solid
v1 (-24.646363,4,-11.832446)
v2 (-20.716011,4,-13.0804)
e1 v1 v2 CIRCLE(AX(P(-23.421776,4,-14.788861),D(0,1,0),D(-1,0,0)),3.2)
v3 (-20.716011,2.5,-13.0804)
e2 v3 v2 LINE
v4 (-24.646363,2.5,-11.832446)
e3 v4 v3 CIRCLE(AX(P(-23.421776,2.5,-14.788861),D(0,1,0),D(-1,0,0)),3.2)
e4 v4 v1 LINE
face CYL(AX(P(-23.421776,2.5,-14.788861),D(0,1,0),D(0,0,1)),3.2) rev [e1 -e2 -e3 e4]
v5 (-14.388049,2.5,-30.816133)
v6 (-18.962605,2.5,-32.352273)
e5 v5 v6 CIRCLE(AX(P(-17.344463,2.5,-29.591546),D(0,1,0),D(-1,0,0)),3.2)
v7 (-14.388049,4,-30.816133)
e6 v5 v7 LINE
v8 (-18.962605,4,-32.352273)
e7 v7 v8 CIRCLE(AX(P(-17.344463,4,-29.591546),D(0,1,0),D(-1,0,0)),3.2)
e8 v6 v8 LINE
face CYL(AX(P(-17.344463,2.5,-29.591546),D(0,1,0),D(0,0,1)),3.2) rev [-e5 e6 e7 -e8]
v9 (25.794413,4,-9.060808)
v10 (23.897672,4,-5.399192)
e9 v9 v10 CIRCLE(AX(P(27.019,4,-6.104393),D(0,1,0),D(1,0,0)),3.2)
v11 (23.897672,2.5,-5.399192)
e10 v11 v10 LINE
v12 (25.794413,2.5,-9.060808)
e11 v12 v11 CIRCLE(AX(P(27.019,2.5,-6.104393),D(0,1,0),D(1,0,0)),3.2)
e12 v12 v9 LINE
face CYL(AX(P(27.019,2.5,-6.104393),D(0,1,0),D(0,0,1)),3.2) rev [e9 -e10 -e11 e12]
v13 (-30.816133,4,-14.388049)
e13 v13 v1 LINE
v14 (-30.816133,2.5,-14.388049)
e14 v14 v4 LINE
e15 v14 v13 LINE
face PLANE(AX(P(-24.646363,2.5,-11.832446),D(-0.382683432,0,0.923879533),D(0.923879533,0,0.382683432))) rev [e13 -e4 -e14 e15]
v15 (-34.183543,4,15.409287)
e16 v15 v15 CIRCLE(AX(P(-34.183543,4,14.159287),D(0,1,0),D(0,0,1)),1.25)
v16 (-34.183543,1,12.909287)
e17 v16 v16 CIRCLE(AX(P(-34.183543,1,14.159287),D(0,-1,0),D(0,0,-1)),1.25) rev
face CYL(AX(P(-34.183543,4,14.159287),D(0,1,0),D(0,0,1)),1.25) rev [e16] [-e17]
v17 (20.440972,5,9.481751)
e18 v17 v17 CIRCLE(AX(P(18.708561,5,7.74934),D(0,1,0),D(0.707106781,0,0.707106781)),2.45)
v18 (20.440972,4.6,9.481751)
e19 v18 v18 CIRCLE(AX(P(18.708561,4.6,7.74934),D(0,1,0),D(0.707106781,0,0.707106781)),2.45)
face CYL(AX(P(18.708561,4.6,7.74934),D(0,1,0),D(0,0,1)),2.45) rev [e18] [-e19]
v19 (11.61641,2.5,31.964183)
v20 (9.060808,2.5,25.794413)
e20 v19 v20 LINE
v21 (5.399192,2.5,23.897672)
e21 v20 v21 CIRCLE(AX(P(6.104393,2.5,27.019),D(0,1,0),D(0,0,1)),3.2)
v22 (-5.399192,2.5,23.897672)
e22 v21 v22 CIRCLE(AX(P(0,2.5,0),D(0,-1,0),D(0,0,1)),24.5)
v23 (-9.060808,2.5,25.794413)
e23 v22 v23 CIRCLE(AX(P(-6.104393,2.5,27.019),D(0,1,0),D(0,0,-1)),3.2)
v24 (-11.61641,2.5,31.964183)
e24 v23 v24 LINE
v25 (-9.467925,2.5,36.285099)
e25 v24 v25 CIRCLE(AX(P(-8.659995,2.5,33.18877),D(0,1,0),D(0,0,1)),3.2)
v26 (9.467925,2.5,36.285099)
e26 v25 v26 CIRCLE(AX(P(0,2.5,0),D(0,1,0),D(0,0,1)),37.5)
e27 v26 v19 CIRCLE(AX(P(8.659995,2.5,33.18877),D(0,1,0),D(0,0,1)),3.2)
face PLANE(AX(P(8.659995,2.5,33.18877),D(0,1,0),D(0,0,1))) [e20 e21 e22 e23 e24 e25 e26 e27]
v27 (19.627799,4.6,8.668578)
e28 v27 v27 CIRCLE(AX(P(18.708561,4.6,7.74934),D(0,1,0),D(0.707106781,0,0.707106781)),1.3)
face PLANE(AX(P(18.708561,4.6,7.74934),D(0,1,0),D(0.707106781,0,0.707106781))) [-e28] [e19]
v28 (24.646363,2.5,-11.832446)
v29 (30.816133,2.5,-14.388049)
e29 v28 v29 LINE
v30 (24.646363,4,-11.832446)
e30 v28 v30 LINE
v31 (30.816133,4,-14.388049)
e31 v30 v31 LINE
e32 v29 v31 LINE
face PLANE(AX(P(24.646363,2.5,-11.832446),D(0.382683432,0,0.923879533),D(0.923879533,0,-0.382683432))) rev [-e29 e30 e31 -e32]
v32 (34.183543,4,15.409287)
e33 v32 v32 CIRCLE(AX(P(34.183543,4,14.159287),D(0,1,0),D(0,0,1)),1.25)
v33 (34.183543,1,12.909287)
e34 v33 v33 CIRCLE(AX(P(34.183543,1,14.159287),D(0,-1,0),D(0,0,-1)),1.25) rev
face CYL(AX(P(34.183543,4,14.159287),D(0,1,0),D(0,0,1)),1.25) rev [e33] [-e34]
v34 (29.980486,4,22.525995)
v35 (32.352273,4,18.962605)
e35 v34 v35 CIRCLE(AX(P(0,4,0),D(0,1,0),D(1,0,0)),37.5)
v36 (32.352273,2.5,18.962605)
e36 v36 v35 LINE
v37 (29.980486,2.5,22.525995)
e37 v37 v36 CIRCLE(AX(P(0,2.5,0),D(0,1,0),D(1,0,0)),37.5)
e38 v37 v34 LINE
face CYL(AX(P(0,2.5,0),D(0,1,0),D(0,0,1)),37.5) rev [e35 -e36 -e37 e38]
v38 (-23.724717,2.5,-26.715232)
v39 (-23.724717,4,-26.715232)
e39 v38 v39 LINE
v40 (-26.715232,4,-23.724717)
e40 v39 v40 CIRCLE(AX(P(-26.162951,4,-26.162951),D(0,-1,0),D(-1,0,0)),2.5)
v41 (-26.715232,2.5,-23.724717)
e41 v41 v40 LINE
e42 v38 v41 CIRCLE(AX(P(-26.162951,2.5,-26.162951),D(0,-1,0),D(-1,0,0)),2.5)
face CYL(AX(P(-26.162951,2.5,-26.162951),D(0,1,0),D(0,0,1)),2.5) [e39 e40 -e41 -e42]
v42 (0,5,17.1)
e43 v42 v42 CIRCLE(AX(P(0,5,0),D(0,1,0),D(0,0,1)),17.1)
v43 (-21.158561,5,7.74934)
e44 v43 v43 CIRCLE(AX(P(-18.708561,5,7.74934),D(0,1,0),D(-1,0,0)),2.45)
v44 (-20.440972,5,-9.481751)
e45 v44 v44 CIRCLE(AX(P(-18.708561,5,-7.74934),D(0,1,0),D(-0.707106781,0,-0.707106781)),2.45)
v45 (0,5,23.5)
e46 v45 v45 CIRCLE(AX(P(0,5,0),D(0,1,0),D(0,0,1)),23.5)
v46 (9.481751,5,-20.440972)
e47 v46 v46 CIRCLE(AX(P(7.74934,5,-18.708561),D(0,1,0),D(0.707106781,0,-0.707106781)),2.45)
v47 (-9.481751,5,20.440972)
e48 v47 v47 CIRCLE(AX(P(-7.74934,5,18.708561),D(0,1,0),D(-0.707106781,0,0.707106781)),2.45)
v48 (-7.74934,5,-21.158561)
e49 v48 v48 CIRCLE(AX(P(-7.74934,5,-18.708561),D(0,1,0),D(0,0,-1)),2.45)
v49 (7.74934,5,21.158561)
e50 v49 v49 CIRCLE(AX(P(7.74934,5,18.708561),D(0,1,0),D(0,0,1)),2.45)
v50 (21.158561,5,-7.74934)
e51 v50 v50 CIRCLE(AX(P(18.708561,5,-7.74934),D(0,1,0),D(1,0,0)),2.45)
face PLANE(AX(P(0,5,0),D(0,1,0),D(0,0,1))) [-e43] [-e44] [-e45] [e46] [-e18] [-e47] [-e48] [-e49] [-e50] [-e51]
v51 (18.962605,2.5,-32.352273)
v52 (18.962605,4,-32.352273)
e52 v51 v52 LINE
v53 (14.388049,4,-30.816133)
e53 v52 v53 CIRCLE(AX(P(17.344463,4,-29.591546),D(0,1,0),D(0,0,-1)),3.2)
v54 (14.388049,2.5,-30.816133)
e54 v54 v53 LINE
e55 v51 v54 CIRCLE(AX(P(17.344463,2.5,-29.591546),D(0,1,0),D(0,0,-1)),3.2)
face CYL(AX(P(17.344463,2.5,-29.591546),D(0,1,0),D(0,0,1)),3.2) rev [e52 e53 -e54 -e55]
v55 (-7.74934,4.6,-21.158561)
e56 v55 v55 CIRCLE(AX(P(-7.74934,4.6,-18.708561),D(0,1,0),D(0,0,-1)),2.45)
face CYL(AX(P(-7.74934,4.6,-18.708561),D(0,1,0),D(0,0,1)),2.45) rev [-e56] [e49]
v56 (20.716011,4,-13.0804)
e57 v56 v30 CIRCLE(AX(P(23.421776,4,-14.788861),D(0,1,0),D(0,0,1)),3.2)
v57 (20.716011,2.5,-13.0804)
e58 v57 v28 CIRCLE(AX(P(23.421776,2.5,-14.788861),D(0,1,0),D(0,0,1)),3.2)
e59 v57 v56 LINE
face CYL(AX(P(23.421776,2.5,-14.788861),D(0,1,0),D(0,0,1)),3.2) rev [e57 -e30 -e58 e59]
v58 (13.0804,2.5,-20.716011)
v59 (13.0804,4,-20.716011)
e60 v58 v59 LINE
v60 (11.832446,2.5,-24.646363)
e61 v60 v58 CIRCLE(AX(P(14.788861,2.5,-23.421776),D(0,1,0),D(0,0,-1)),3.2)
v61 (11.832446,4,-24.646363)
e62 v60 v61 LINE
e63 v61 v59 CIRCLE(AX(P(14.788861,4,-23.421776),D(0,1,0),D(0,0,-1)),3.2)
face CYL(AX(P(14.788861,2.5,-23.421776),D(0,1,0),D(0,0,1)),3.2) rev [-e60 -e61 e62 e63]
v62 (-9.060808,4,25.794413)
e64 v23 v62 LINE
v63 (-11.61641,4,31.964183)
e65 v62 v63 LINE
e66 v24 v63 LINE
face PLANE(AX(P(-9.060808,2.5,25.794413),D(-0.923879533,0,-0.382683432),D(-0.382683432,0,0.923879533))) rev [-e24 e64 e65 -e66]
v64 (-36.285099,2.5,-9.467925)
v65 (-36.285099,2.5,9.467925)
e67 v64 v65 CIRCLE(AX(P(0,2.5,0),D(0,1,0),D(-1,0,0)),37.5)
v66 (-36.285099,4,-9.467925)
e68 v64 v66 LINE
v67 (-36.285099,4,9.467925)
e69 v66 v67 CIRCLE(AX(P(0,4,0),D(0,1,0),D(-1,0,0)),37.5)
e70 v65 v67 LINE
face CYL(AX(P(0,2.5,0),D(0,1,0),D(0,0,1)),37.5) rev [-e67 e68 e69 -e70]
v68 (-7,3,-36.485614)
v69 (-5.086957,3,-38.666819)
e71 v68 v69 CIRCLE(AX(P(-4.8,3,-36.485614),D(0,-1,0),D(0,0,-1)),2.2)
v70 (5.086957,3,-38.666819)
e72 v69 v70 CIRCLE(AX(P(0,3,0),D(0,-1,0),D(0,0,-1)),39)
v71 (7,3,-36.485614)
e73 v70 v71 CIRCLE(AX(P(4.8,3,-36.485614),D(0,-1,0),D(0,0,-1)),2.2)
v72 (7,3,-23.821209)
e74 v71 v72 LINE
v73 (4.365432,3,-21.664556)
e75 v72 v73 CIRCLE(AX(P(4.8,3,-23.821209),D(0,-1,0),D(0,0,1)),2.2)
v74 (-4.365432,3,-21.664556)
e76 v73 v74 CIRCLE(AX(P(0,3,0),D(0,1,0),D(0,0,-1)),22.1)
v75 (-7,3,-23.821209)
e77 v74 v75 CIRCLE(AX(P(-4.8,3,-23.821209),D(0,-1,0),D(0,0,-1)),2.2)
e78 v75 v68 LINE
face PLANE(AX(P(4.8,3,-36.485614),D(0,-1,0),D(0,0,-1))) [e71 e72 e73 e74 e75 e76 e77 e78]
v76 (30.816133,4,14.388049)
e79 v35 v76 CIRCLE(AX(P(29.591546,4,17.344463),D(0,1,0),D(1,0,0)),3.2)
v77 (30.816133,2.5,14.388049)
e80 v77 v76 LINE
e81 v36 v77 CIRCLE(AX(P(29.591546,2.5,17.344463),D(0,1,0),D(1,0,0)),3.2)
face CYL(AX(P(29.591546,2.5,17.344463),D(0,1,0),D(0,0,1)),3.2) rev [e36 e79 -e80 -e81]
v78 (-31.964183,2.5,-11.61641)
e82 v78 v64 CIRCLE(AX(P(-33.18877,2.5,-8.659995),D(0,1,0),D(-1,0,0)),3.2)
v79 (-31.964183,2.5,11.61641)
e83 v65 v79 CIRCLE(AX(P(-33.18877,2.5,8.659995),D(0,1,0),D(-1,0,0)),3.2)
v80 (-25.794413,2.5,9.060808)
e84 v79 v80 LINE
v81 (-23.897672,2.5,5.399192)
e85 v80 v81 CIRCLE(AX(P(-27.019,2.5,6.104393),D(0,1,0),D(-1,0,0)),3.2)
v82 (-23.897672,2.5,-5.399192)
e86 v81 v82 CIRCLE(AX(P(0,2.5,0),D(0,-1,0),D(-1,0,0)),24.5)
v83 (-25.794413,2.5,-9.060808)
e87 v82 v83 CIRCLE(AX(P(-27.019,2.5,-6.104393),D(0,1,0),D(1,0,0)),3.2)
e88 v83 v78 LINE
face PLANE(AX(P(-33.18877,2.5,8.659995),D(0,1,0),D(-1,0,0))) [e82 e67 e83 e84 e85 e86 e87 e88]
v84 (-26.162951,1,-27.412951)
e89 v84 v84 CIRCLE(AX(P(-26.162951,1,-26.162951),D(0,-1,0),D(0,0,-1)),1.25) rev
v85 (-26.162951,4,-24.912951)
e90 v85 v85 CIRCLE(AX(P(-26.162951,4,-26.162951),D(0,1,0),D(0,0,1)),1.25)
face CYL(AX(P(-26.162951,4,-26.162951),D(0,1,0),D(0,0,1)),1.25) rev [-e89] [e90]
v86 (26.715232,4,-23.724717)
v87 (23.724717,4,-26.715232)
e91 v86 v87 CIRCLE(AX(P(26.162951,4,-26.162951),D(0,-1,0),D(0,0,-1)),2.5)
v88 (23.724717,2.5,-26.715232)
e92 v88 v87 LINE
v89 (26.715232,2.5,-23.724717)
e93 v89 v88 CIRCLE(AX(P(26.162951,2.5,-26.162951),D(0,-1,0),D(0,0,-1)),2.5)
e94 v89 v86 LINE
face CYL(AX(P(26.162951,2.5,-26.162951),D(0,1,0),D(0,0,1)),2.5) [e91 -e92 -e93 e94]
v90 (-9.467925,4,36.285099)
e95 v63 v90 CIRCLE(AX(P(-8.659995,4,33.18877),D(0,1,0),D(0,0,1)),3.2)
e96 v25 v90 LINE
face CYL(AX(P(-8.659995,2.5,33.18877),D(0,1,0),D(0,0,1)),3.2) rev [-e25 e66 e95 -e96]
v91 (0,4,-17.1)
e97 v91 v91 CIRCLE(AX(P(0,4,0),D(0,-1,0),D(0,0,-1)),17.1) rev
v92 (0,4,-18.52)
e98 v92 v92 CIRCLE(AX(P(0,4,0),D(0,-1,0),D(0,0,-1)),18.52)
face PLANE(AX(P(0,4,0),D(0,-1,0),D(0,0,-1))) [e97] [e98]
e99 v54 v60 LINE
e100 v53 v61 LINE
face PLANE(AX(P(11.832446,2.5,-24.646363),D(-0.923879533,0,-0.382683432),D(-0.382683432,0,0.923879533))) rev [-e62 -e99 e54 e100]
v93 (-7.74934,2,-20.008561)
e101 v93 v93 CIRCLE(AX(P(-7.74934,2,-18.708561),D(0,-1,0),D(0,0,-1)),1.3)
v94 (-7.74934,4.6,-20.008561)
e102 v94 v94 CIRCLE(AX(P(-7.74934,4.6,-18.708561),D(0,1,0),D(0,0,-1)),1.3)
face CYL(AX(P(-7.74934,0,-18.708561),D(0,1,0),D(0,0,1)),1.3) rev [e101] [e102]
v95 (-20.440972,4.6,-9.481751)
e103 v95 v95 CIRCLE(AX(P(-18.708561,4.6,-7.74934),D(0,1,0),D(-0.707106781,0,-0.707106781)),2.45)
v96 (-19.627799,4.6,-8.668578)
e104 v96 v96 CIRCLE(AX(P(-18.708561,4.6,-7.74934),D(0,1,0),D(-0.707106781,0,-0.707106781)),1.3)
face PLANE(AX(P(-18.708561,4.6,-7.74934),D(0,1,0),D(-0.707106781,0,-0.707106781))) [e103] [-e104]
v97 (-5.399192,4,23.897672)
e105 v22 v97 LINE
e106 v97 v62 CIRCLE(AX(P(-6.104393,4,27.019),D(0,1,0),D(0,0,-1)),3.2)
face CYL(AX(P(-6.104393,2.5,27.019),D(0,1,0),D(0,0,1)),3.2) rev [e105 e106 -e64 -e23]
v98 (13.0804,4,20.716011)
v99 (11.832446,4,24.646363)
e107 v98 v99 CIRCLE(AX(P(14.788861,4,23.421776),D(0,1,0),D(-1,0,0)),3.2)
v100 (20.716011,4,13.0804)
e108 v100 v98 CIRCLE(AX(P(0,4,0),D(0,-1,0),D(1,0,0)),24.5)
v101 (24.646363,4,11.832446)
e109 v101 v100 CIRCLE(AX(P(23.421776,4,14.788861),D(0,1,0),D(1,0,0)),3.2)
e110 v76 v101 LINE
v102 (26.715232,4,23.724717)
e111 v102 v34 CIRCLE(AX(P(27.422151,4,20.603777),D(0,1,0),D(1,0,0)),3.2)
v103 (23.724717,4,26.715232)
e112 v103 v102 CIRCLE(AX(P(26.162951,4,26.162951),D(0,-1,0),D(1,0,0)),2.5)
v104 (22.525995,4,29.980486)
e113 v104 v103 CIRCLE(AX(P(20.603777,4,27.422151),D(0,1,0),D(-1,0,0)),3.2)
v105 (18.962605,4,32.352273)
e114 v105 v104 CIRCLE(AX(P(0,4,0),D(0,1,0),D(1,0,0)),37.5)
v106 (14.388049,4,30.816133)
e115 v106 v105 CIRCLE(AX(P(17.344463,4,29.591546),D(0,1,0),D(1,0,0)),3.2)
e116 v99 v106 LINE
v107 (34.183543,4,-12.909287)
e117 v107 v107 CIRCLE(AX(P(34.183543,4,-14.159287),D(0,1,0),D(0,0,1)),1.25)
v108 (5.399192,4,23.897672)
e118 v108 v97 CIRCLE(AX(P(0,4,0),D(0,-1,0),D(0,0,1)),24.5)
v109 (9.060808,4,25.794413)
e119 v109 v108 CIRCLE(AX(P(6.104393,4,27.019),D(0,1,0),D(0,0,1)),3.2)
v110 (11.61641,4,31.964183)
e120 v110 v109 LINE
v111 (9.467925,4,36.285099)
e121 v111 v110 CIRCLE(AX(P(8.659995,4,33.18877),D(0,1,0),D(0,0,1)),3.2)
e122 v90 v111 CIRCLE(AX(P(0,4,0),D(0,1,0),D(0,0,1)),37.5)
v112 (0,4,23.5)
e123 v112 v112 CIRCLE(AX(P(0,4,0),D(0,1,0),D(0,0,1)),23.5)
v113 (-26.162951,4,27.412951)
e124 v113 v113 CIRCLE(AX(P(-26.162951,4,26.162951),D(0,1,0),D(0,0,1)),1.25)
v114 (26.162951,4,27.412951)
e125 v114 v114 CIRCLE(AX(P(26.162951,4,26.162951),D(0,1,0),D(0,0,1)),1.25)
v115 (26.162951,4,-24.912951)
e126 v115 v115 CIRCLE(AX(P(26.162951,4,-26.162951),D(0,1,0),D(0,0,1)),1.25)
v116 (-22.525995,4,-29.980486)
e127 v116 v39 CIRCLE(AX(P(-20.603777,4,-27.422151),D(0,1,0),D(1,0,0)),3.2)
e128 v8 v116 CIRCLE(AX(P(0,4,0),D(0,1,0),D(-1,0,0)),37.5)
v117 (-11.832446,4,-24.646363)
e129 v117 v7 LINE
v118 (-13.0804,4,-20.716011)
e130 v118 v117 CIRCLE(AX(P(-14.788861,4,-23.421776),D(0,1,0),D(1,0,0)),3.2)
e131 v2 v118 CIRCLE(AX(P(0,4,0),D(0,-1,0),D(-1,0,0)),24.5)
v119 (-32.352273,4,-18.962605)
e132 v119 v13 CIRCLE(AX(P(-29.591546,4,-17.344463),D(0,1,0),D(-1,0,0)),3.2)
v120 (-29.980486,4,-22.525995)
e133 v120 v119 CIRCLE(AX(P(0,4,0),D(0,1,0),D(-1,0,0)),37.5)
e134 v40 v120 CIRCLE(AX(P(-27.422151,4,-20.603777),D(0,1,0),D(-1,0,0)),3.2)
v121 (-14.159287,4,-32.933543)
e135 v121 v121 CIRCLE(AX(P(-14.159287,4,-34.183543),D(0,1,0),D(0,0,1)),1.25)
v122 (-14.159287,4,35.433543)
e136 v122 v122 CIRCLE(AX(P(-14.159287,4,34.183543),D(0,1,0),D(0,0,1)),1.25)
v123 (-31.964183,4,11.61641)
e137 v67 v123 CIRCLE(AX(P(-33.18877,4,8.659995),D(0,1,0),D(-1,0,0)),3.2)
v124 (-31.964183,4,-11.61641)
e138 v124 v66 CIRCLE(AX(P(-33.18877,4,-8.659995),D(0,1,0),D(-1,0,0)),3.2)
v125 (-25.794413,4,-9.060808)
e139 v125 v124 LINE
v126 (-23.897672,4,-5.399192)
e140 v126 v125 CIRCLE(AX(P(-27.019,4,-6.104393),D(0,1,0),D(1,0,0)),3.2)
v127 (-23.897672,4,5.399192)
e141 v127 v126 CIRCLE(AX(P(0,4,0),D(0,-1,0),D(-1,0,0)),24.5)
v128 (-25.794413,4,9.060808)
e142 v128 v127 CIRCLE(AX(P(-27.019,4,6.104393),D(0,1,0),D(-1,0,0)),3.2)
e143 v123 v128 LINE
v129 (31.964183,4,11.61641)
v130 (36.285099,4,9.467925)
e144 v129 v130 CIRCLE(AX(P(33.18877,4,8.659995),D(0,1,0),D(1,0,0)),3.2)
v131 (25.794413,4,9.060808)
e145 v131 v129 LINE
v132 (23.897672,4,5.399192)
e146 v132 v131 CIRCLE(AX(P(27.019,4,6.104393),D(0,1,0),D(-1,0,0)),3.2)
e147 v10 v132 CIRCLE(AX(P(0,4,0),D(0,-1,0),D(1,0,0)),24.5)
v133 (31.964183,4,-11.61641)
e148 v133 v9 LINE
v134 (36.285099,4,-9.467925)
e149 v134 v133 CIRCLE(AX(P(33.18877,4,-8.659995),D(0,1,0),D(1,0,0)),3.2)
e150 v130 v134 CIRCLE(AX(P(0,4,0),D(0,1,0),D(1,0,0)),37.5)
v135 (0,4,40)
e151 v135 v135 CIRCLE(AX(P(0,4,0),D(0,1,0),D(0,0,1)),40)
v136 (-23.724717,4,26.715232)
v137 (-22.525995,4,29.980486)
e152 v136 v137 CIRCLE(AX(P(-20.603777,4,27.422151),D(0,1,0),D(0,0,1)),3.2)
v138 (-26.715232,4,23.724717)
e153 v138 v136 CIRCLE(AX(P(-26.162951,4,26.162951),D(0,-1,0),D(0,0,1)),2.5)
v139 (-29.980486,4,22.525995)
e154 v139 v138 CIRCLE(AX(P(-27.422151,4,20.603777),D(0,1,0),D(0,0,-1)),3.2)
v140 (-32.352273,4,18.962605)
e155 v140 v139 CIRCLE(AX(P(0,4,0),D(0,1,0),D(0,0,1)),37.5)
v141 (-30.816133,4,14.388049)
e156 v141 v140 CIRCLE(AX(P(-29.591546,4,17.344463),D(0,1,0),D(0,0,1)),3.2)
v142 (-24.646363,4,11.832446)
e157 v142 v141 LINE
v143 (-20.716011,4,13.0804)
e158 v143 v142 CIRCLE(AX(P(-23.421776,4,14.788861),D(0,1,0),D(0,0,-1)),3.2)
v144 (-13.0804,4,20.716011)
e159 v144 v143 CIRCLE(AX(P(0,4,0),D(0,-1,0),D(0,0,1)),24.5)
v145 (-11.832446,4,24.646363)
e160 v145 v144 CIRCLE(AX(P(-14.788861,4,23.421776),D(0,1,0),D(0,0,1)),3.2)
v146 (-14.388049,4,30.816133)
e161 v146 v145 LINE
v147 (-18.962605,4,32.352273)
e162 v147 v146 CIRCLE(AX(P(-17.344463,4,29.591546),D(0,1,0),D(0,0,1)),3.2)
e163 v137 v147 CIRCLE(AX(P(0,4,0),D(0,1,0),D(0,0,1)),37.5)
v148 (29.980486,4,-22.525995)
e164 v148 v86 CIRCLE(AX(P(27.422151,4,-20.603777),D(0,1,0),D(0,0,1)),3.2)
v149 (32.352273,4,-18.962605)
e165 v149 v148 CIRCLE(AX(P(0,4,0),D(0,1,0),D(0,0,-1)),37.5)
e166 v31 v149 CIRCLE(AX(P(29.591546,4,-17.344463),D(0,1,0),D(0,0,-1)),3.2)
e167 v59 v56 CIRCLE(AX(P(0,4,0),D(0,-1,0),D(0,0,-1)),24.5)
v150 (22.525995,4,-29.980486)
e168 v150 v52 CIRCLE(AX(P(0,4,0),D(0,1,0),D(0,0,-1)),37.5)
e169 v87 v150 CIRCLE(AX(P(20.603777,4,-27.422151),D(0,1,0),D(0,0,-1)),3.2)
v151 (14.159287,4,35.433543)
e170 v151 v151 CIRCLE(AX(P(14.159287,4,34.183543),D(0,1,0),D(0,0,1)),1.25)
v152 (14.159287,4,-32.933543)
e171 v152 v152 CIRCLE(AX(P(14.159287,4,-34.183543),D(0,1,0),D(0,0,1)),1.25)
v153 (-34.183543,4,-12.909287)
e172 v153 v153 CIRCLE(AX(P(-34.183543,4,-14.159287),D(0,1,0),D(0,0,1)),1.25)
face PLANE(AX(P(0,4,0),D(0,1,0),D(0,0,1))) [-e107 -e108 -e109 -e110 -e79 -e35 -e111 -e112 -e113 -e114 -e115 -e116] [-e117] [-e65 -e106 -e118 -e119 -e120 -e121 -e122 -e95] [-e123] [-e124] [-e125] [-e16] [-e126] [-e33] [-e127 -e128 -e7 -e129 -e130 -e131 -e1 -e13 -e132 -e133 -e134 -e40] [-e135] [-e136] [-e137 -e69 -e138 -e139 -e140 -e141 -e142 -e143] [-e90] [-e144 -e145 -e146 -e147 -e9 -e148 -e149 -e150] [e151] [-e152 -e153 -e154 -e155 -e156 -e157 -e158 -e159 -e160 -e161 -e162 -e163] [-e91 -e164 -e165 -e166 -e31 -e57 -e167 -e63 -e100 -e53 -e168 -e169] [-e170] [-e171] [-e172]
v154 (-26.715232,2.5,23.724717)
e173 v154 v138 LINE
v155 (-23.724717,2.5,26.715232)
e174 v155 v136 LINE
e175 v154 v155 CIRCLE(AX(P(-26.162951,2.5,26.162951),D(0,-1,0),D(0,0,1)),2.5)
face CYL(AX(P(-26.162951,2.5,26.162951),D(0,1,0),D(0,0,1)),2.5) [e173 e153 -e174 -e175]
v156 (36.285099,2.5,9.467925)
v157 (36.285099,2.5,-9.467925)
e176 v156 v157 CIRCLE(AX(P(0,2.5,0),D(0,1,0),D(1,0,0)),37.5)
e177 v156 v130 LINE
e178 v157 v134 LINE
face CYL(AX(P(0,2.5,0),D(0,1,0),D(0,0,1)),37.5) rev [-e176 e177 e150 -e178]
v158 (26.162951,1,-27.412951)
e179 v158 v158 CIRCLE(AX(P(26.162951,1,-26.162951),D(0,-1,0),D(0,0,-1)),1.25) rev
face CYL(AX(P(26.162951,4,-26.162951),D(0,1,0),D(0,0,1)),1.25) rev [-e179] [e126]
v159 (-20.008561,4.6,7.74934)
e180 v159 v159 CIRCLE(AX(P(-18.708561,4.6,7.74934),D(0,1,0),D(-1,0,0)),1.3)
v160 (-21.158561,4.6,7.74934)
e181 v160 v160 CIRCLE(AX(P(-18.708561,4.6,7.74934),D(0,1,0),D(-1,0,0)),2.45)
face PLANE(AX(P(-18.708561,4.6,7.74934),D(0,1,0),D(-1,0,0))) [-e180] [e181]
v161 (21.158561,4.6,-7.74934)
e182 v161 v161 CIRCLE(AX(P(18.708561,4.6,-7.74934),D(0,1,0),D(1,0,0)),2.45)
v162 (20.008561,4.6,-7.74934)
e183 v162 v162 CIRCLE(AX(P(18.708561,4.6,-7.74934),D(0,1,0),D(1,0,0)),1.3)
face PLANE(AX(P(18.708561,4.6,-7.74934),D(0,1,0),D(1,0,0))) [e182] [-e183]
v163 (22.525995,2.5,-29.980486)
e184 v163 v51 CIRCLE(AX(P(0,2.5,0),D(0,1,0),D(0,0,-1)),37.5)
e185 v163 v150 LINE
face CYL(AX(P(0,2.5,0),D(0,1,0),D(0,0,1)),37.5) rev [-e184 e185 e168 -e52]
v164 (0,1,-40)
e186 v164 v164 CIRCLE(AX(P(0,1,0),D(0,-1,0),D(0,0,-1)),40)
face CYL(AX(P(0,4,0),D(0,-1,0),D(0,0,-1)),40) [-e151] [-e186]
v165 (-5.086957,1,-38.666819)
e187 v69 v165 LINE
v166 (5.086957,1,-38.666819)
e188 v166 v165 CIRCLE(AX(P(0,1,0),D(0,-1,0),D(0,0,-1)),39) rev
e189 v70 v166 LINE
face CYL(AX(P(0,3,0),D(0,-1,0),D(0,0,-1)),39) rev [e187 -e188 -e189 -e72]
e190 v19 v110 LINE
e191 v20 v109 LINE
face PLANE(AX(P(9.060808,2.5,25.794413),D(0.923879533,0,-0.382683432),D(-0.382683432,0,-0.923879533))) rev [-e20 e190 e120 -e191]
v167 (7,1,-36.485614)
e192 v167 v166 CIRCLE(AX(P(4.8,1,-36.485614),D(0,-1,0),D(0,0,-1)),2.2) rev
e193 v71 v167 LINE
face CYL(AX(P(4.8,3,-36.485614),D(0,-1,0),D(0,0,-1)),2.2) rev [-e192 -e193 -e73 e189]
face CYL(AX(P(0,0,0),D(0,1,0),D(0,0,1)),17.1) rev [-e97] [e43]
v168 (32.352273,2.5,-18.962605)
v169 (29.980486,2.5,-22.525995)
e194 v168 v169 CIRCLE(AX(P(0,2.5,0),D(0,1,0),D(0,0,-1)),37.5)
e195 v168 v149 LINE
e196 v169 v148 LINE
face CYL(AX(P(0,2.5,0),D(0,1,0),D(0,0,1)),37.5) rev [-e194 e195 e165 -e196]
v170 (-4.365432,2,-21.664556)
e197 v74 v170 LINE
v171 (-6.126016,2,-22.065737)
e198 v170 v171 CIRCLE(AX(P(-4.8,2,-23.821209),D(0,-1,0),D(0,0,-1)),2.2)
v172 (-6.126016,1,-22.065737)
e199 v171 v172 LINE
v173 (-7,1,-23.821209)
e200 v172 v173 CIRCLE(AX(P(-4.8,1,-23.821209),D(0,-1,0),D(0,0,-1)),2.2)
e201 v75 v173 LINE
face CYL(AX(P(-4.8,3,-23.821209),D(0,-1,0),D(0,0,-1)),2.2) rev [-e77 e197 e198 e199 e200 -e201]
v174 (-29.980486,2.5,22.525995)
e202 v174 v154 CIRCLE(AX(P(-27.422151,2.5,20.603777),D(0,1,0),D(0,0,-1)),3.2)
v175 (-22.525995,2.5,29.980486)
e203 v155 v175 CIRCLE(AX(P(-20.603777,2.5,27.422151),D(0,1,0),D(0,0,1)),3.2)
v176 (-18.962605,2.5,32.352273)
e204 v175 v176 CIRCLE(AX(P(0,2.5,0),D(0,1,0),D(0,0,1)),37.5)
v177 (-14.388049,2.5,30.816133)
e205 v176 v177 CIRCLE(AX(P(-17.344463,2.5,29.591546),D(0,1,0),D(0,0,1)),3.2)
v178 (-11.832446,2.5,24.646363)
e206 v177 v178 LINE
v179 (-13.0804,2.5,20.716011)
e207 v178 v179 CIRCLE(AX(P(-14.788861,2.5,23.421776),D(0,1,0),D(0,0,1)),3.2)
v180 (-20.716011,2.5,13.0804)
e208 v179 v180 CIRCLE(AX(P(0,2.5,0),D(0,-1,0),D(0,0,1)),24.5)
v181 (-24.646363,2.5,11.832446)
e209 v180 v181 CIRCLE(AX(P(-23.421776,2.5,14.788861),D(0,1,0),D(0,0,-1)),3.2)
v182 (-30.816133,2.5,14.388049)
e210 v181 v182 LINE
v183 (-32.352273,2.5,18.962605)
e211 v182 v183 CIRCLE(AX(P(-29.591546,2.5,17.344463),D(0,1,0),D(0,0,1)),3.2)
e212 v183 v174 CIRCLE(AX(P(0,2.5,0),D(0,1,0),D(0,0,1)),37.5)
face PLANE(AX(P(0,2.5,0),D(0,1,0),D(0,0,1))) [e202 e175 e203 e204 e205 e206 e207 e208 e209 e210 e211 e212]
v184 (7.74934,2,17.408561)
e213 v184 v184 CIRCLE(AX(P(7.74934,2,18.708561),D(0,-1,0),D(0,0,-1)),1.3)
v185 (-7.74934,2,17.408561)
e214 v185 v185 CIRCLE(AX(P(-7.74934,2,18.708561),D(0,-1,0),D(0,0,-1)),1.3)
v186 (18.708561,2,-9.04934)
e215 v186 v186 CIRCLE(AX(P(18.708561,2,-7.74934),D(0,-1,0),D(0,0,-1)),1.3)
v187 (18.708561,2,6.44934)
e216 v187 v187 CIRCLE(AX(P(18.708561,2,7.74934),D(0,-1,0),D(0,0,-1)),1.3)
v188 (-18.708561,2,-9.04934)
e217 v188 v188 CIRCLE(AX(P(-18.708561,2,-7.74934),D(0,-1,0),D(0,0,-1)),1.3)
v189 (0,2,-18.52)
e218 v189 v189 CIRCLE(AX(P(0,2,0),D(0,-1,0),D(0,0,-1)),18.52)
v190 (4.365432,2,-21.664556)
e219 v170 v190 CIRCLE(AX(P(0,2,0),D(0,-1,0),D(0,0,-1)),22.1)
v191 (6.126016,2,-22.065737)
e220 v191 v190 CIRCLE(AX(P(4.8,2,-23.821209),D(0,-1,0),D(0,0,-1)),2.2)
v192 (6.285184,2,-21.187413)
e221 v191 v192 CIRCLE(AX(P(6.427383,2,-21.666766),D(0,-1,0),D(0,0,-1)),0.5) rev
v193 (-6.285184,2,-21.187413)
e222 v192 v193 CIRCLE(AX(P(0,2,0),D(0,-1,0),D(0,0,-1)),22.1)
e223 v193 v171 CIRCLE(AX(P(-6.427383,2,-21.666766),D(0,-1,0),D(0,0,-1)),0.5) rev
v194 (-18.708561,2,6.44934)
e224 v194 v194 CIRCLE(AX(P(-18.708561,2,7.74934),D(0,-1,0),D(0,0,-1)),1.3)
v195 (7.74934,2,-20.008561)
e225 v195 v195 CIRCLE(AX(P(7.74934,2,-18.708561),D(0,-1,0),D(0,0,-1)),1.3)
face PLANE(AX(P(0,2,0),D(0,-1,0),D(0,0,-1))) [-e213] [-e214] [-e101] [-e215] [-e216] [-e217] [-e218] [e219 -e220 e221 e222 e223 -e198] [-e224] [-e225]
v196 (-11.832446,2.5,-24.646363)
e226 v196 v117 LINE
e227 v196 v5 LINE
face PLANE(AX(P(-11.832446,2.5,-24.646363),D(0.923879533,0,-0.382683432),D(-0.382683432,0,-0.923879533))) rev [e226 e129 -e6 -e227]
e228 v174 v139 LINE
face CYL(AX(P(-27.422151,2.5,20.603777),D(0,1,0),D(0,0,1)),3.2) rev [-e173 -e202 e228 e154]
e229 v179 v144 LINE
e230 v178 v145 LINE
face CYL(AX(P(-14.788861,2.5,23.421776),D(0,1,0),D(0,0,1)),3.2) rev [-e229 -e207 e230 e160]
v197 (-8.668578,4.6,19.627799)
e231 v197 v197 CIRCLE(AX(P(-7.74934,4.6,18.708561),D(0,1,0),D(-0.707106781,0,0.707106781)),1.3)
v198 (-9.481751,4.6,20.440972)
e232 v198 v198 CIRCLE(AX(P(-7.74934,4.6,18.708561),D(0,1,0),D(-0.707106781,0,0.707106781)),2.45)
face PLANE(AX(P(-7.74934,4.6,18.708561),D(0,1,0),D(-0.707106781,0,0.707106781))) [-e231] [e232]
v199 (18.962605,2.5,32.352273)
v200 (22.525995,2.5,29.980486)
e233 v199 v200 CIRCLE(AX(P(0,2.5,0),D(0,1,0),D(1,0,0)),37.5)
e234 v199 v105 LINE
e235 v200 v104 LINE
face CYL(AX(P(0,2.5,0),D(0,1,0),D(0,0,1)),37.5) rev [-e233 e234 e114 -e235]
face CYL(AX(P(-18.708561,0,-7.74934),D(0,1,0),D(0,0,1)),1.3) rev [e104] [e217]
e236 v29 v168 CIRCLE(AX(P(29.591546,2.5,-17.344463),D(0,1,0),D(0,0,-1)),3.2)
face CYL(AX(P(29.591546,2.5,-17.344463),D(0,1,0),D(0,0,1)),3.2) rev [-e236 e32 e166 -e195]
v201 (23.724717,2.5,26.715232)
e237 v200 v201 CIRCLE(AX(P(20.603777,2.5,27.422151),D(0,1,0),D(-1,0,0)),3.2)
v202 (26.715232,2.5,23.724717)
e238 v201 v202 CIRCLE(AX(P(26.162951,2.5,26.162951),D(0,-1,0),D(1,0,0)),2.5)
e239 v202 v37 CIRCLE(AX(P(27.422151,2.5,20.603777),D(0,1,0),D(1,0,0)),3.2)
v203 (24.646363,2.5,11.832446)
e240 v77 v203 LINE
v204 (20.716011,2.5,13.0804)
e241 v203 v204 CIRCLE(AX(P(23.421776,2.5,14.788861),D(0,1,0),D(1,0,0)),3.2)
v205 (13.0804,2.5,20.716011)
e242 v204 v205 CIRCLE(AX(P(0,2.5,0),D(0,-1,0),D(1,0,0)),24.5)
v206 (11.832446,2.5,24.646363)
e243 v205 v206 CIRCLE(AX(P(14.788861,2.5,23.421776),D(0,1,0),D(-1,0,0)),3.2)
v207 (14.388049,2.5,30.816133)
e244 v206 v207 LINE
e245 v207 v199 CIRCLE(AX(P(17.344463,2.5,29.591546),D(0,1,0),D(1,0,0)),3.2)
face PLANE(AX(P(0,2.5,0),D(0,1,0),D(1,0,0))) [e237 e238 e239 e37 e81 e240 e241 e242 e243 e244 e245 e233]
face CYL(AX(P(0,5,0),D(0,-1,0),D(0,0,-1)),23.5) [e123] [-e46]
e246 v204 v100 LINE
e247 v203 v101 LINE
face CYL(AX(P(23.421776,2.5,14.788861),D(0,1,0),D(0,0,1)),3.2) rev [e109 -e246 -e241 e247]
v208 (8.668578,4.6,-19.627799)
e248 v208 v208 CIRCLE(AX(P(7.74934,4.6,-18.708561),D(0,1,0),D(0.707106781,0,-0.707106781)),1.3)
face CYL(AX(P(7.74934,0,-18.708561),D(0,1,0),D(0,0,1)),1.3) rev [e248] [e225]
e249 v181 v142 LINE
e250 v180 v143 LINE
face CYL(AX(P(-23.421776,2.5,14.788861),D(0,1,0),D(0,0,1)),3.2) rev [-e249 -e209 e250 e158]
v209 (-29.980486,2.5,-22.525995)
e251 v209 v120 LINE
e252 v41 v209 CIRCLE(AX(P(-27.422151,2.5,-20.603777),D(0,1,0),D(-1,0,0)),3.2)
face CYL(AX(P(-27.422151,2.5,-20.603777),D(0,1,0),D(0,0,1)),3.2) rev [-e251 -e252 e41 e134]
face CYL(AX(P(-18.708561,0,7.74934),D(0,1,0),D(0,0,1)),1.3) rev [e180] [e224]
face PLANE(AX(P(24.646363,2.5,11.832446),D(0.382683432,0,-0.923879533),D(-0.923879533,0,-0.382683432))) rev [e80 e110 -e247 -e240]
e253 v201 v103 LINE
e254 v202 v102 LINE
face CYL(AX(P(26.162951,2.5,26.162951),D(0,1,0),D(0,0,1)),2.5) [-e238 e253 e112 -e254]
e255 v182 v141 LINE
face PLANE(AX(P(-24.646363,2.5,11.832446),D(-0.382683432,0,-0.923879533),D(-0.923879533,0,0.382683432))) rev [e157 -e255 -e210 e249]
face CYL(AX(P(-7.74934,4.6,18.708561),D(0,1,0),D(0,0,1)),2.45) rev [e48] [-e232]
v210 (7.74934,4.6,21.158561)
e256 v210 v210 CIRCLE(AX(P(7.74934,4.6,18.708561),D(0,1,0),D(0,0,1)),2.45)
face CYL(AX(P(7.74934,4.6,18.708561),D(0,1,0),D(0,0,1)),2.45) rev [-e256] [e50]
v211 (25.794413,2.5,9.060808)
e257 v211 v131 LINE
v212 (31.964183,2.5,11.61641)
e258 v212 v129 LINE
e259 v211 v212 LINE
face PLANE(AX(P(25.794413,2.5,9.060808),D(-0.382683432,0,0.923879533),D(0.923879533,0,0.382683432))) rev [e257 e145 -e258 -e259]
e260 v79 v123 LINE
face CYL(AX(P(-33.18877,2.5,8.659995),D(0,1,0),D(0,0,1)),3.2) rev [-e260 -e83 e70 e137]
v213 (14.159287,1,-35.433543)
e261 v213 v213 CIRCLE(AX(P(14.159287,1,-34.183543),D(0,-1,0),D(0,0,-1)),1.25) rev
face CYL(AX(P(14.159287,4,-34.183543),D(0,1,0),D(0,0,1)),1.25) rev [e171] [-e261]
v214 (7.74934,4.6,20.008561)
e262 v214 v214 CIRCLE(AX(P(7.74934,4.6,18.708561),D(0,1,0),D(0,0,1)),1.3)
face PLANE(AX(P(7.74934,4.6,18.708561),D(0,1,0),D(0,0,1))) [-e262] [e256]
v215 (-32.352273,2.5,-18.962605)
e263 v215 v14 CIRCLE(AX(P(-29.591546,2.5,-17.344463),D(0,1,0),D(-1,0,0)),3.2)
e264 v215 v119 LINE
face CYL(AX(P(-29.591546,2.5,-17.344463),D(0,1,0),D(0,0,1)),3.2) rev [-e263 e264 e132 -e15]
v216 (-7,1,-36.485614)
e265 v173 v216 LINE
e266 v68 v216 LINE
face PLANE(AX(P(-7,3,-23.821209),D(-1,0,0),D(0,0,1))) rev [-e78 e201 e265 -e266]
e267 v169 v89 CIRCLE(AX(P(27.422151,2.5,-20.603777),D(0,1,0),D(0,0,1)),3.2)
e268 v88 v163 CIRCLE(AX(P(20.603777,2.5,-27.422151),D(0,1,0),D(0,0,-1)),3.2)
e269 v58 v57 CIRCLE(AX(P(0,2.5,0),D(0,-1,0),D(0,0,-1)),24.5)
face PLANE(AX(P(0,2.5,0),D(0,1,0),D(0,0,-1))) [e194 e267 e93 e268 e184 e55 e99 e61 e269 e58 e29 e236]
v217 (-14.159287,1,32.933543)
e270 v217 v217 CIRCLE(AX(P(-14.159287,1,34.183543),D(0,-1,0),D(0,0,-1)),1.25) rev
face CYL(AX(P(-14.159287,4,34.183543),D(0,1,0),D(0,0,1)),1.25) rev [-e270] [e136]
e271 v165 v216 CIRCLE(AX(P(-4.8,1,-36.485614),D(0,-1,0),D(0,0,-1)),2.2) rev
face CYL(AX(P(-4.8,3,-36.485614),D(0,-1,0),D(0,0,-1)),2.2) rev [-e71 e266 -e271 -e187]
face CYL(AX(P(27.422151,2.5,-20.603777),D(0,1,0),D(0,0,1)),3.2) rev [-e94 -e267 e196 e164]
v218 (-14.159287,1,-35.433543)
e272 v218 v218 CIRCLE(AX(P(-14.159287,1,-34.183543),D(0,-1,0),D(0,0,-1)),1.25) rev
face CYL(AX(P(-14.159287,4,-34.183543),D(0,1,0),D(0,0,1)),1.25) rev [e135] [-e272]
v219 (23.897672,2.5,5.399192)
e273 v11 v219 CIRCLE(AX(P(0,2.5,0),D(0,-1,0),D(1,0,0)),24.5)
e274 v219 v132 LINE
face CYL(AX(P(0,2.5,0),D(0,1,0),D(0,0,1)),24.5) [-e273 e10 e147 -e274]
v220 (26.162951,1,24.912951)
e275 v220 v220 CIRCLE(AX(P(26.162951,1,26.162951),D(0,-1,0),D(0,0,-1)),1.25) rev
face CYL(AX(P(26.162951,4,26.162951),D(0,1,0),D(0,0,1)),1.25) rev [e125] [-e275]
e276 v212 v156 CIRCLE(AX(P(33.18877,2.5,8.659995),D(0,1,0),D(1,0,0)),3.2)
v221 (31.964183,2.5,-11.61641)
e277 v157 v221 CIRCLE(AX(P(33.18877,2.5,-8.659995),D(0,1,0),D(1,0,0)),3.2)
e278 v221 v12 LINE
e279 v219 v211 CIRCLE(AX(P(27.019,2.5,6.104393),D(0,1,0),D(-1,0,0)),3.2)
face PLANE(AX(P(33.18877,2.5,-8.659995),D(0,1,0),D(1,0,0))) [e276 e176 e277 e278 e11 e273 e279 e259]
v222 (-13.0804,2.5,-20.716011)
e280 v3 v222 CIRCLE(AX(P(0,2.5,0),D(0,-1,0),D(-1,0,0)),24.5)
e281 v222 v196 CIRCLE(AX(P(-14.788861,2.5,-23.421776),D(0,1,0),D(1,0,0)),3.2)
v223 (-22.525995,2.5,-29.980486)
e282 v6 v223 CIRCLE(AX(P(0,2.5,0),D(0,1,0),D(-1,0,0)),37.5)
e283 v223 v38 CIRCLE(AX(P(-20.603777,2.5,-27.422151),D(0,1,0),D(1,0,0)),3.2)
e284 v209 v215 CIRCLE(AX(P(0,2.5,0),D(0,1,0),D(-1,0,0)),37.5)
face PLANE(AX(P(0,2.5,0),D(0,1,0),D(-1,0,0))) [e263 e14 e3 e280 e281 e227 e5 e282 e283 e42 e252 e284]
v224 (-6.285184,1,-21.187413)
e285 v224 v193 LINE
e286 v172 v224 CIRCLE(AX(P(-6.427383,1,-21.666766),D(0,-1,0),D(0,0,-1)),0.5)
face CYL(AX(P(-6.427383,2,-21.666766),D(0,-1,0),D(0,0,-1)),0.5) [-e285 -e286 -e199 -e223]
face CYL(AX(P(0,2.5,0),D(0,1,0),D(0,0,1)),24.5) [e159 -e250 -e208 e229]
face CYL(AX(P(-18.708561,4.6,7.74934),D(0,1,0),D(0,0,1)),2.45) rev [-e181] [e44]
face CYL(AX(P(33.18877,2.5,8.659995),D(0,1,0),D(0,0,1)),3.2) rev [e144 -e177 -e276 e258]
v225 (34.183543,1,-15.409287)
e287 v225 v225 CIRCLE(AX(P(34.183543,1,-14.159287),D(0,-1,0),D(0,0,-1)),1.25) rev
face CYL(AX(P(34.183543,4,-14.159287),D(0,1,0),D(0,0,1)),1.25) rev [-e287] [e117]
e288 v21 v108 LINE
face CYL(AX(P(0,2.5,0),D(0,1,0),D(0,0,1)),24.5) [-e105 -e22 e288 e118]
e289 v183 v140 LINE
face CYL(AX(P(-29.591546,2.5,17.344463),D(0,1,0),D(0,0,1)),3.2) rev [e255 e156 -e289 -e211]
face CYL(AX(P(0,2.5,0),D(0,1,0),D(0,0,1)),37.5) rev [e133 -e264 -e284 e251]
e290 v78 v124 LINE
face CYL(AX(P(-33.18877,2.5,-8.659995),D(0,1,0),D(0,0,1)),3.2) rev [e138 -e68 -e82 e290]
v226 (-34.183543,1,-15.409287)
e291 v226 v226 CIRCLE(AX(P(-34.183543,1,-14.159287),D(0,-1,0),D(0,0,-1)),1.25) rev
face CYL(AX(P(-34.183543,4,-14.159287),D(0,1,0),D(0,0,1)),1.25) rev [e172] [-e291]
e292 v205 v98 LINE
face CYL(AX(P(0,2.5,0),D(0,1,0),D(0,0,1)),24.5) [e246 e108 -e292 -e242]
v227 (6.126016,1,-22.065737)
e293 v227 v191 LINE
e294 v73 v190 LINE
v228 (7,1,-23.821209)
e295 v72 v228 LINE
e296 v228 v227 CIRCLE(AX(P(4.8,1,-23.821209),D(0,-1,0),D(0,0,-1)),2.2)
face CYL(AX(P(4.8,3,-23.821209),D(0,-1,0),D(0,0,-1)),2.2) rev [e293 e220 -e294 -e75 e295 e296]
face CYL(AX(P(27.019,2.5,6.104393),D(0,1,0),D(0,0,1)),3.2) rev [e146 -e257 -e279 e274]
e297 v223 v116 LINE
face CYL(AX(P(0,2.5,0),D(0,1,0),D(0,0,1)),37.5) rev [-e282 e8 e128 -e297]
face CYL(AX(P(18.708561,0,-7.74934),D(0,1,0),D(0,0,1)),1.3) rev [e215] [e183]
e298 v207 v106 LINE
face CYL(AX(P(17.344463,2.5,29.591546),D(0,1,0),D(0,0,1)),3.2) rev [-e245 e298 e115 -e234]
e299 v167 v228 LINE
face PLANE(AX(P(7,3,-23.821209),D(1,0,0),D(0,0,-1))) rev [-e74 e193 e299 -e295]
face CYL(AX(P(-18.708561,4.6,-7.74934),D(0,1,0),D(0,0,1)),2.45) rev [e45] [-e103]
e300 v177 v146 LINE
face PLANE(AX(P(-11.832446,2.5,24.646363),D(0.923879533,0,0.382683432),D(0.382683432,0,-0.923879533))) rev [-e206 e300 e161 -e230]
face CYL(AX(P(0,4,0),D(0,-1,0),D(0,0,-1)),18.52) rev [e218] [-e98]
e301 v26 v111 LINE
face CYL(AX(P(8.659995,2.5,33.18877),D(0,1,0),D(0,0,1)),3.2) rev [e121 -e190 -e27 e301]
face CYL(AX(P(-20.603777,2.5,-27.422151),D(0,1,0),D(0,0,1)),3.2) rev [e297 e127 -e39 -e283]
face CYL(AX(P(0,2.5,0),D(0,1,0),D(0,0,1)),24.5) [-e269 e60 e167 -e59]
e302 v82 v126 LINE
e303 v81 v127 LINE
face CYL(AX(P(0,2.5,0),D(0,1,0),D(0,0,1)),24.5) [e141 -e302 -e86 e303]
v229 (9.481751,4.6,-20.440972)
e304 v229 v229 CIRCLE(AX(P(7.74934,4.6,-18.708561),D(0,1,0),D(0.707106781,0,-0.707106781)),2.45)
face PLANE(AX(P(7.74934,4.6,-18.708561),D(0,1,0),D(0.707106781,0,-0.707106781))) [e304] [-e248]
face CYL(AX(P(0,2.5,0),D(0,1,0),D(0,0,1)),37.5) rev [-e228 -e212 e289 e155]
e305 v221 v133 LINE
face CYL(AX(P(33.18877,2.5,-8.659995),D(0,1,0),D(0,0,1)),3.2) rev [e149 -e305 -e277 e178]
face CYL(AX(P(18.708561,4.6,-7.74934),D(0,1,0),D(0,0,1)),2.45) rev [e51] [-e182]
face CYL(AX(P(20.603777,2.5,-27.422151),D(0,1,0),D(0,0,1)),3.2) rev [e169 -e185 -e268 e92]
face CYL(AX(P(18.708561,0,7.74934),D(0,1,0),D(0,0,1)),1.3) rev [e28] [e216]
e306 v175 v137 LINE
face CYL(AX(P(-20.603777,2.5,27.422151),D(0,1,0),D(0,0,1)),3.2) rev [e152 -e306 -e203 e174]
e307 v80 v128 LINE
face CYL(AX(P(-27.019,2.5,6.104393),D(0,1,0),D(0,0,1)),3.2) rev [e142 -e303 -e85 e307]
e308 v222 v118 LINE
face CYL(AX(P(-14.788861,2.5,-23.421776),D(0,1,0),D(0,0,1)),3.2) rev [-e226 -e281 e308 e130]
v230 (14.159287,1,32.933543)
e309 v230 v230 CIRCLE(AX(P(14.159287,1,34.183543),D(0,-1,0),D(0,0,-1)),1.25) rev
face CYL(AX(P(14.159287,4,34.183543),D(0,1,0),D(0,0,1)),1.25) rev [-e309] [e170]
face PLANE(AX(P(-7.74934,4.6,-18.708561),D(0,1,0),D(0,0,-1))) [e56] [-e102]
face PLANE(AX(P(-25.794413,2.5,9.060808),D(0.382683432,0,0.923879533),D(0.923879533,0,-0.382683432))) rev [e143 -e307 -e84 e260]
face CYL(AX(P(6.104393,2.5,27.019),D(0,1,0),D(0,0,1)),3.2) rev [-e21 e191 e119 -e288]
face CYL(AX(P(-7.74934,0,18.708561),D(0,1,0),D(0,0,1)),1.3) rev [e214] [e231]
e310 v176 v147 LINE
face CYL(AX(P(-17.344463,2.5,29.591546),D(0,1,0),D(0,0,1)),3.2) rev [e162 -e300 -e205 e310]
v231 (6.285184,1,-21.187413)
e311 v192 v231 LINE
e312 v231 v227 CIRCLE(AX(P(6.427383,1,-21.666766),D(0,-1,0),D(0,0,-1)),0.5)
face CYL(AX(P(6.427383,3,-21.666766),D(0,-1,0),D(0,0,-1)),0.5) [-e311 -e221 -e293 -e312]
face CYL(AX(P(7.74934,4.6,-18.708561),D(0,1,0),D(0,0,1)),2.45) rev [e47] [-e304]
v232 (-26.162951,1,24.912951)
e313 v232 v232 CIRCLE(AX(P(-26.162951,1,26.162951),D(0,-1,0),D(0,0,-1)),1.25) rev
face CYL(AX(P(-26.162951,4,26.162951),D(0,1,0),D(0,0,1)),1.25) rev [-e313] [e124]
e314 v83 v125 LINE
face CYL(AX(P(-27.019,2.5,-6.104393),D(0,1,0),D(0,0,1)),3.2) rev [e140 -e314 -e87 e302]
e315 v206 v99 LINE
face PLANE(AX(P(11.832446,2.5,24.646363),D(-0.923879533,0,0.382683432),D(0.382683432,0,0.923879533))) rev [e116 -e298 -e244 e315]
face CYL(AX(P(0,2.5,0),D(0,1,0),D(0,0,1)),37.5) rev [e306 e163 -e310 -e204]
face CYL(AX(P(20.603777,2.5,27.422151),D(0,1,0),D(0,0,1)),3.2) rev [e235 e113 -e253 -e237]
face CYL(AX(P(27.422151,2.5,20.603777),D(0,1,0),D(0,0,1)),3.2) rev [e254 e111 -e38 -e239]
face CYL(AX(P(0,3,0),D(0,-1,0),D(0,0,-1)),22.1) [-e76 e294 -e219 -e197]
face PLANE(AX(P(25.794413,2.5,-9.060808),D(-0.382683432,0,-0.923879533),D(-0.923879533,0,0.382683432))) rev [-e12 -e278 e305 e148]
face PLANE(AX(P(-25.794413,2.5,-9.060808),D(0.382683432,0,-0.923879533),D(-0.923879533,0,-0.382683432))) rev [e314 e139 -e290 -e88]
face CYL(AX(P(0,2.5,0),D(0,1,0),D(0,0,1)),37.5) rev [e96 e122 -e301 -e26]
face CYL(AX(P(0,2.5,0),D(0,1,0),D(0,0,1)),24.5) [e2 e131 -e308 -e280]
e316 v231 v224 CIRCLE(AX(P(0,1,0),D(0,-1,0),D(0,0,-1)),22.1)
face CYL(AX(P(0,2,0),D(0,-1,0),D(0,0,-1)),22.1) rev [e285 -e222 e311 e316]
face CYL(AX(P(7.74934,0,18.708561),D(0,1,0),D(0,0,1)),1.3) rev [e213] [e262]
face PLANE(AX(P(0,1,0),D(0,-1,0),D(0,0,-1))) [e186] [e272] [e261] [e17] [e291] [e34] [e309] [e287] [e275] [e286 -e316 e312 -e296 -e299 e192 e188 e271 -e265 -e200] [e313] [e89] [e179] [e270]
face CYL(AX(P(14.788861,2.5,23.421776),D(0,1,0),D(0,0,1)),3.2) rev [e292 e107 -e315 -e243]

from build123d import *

# Parameters (mm, degrees)
SKETCH_2_R               = 40
EXTRUDE_1_DEPTH          = 4
SKETCH_3_R               = 23.5
EXTRUDE_2_DEPTH          = 1
SKETCH_4_R               = 17.1
CUT_EXTRUDE_1_DEPTH      = 57.789083458
SKETCH_5_R               = 33.5
CUT_EXTRUDE_2_DEPTH      = 1
SKETCH_6_R               = 22.1
CUT_EXTRUDE_3_DEPTH      = 1
SKETCH_7_R               = 18.52
CUT_EXTRUDE_4_DEPTH      = 2
HOLE_WIZARD_M3_1_D       = 2.5
CUT_EXTRUDE_5_DEPTH      = 1.5
PATTERN_CIRCULAR_1_COUNT = 2
PATTERN_CIRCULAR_1_ANGLE = 90
F_1_THE_OTHER_WAY_COUNT  = 2
F_1_THE_OTHER_WAY_ANGLE  = 90
CUT_EXTRUDE_6_DEPTH      = 1.5
PATTERN_CIRCULAR_2_COUNT = 4
CUT_EXTRUDE_7_DEPTH      = 3
FILLET_1_DEPTH           = 2
SKETCH_17_R              = 2.45
CUT_EXTRUDE_8_DEPTH      = 0.4
SKETCH_18_R              = 1.3
CUT_EXTRUDE_9_DEPTH      = 57.755264073
PATTERN_CIRCULAR_3_COUNT = 8
SKETCH_19_W              = 100
SKETCH_19_H              = 100
CUT_EXTRUDE_11_DEPTH     = 1


with BuildPart() as part:
    # 草图2 → 凸台-拉伸1 (new body)
    with BuildSketch(Plane(origin=(0, 0, 0), x_dir=(1, 0, 0), z_dir=(0, 1, 0))):
        with Locations(Location((0, 0, 0), (0, 0, 270))):
            Circle(SKETCH_2_R)
    extrude(amount=EXTRUDE_1_DEPTH)

    # 草图3 → 凸台-拉伸2 (add)
    with BuildSketch(Plane(origin=(0, 4, 0), x_dir=(1, 0, 0), z_dir=(0, 1, 0))):
        with Locations(Location((0, 0, 0), (0, 0, 270))):
            Circle(SKETCH_3_R)
    extrude(amount=EXTRUDE_2_DEPTH)

    # 草图4 → 切除-拉伸1 (cut, through all)
    with BuildSketch(Plane(origin=(0, 5, 0), x_dir=(1, 0, 0), z_dir=(0, 1, 0))):
        with Locations(Location((0, 0, 0), (0, 0, 270))):
            Circle(SKETCH_4_R)
    extrude(amount=-CUT_EXTRUDE_1_DEPTH, mode=Mode.SUBTRACT)

    # 草图5 → 切除-拉伸2 (cut)
    with BuildSketch(Plane.XZ):
        with Locations(Location((0, 0, 0), (0, 0, 270))):
            Circle(SKETCH_5_R)
    extrude(amount=-CUT_EXTRUDE_2_DEPTH, mode=Mode.SUBTRACT)

    # 草图6 → 切除-拉伸3 (cut)
    with BuildSketch(Plane.XZ.offset(-1)):
        with Locations(Location((0, 0, 0), (0, 0, 270))):
            Circle(SKETCH_6_R)
    extrude(amount=-CUT_EXTRUDE_3_DEPTH, mode=Mode.SUBTRACT)

    # 草图7 → 切除-拉伸4 (cut)
    with BuildSketch(Plane.XZ.offset(-2)):
        with Locations(Location((0, 0, 0), (0, 0, 270))):
            Circle(SKETCH_7_R)
    extrude(amount=-CUT_EXTRUDE_4_DEPTH, mode=Mode.SUBTRACT)

    # M3 螺纹孔1 (through all)
    with Locations(Plane(origin=(0, 4, 0), x_dir=(1, 0, 0), z_dir=(0, 1, 0))):
        with Locations((26.162950904, 26.162950904), (-26.162950904, -26.162950904), (-26.162950904, 26.162950904), (26.162950904, -26.162950904), (-14.159286998, 34.183542703), (14.159286998, 34.183542703), (34.183542703, 14.159286998), (34.183542703, -14.159286998), (14.159286998, -34.183542703), (-14.159286998, -34.183542703), (-34.183542703, -14.159286998), (-34.183542703, 14.159286998)):
            Hole(HOLE_WIZARD_M3_1_D / 2)

    # 草图11 → 切除-拉伸5 (cut)
    with BuildSketch(Plane(origin=(0, 4, 0), x_dir=(1, 0, 0), z_dir=(0, 1, 0))):
        with BuildLine():
            Line((-9.060807589, -25.794413462), (-11.616409968, -31.964183385))
            ThreePointArc((-11.616409968, -31.964183385), (-11.525331247, -34.613498711), (-9.46792507, -36.285098799))
            ThreePointArc((-9.46792507, -36.285098799), (0, -37.5), (9.46792507, -36.285098799))
            ThreePointArc((9.46792507, -36.285098799), (11.525331247, -34.613498711), (11.616409968, -31.964183385))
            Line((11.616409968, -31.964183385), (9.060807589, -25.794413462))
            ThreePointArc((9.060807589, -25.794413462), (7.576262006, -24.177592013), (5.39919244, -23.897671874))
            ThreePointArc((5.39919244, -23.897671874), (0, -24.5), (-5.39919244, -23.897671874))
            ThreePointArc((-5.39919244, -23.897671874), (-7.576262006, -24.177592013), (-9.060807589, -25.794413462))
        make_face()
    cut_extrude_5 = extrude(amount=-CUT_EXTRUDE_5_DEPTH, mode=Mode.SUBTRACT)

    # 阵列(圆周)1: 切除-拉伸5 ×2 about axis
    pattern_circular_1_axis = Axis((0, 0, 0), (0, 1, 0))
    for i in range(1, PATTERN_CIRCULAR_1_COUNT):
        add(cut_extrude_5.rotate(pattern_circular_1_axis, i * PATTERN_CIRCULAR_1_ANGLE / (PATTERN_CIRCULAR_1_COUNT - 1)), mode=Mode.SUBTRACT)

    # 1 the other way: 切除-拉伸5 ×2 about axis
    f_1_the_other_way_axis = Axis((0, 0, 0), (0, -1, 0))
    for i in range(1, F_1_THE_OTHER_WAY_COUNT):
        add(cut_extrude_5.rotate(f_1_the_other_way_axis, i * F_1_THE_OTHER_WAY_ANGLE / (F_1_THE_OTHER_WAY_COUNT - 1)), mode=Mode.SUBTRACT)

    # 草图15 → 切除-拉伸6 (cut)
    with BuildSketch(Plane(origin=(0, 4, 0), x_dir=(1, 0, 0), z_dir=(0, 1, 0))):
        with BuildLine():
            Line((-24.646363165, -11.832446186), (-30.816133088, -14.388048565))
            ThreePointArc((-30.816133088, -14.388048565), (-32.625079539, -16.325799779), (-32.352273438, -18.962605396))
            ThreePointArc((-32.352273438, -18.962605396), (-31.217265421, -20.778169786), (-29.980485961, -22.52599524))
            ThreePointArc((-29.980485961, -22.52599524), (-28.524951236, -23.607746352), (-26.715231717, -23.724716727))
            ThreePointArc((-26.715231717, -23.724716727), (-24.395183951, -24.395183951), (-23.724716727, -26.715231717))
            ThreePointArc((-23.724716727, -26.715231717), (-23.607746352, -28.524951236), (-22.52599524, -29.980485961))
            ThreePointArc((-22.52599524, -29.980485961), (-20.778169786, -31.217265421), (-18.962605396, -32.352273438))
            ThreePointArc((-18.962605396, -32.352273438), (-16.325799779, -32.625079539), (-14.388048565, -30.816133088))
            Line((-14.388048565, -30.816133088), (-11.832446186, -24.646363165))
            ThreePointArc((-11.832446186, -24.646363165), (-11.738913025, -22.453365506), (-13.08040025, -20.716011424))
            ThreePointArc((-13.08040025, -20.716011424), (-17.324116139, -17.324116139), (-20.716011424, -13.08040025))
            ThreePointArc((-20.716011424, -13.08040025), (-22.453365506, -11.738913025), (-24.646363165, -11.832446186))
        make_face()
    cut_extrude_6 = extrude(amount=-CUT_EXTRUDE_6_DEPTH, mode=Mode.SUBTRACT)

    # 阵列(圆周)2: 切除-拉伸6 ×4 about axis
    pattern_circular_2_axis = Axis((0, 0, 0), (0, 1, 0))
    for i in range(1, PATTERN_CIRCULAR_2_COUNT):
        add(cut_extrude_6.rotate(pattern_circular_2_axis, i * 360 / PATTERN_CIRCULAR_2_COUNT), mode=Mode.SUBTRACT)

    # 草图16 → 切除-拉伸7 (cut)
    with BuildSketch(Plane.XZ):
        with BuildLine():
            Line((-7, -23.821209037), (-7, -36.485613603))
            ThreePointArc((-7, -36.485613603), (-6.453980705, -37.936250645), (-5.086956522, -38.666818764))
            ThreePointArc((-5.086956522, -38.666818764), (0, -39), (5.086956522, -38.666818764))
            ThreePointArc((5.086956522, -38.666818764), (6.453980705, -37.936250645), (7, -36.485613603))
            Line((7, -36.485613603), (7, -23.821209037))
            ThreePointArc((7, -23.821209037), (6.193547742, -22.11885047), (4.365432099, -21.664556367))
            ThreePointArc((4.365432099, -21.664556367), (0, -22.1), (-4.365432099, -21.664556367))
            ThreePointArc((-4.365432099, -21.664556367), (-6.193547742, -22.11885047), (-7, -23.821209037))
        make_face()
    extrude(amount=-CUT_EXTRUDE_7_DEPTH, mode=Mode.SUBTRACT)

    # 圆角1: read off the stored shape, not the designer's step
    # 圆角1 outline → 圆角1 (cut)
    with BuildSketch(Plane(origin=(0, 0, 0), x_dir=(1, 0, 0), z_dir=(0, 1, 0))):
        with BuildLine():
            ThreePointArc((-4.365432099, 21.664556367), (-5.288780383, 21.676193014), (-6.126015716, 22.06573693))
            ThreePointArc((-6.126015716, 22.06573693), (-5.935396115, 21.57760895), (-6.285184187, 21.187412766))
            ThreePointArc((-6.285184187, 21.187412766), (-5.330649428, 21.447474832), (-4.365432099, 21.664556367))
        make_face()
        with BuildLine():
            ThreePointArc((4.365432099, 21.664556367), (5.330649428, 21.447474832), (6.285184187, 21.187412766))
            ThreePointArc((6.285184187, 21.187412766), (5.935396115, 21.57760895), (6.126015716, 22.06573693))
            ThreePointArc((6.126015716, 22.06573693), (5.288780383, 21.676193014), (4.365432099, 21.664556367))
        make_face()
    extrude(amount=FILLET_1_DEPTH, mode=Mode.SUBTRACT)

    # 草图17 → 切除-拉伸8 (cut)
    with BuildSketch(Plane(origin=(0, 5, 0), x_dir=(1, 0, 0), z_dir=(0, 1, 0))):
        with Locations(Location((7.749339505, -18.708560533, 0), (0, 0, 270))):
            Circle(SKETCH_17_R)
    cut_extrude_8 = extrude(amount=-CUT_EXTRUDE_8_DEPTH, mode=Mode.SUBTRACT)

    # 草图18 → 切除-拉伸9 (cut, through all)
    with BuildSketch(Plane(origin=(0, 4.6, 0), x_dir=(1, 0, 0), z_dir=(0, 1, 0))):
        with Locations(Location((7.749339505, -18.708560533, 0), (0, 0, 270))):
            Circle(SKETCH_18_R)
    cut_extrude_9 = extrude(amount=-CUT_EXTRUDE_9_DEPTH, mode=Mode.SUBTRACT)

    # 阵列(圆周)3: 切除-拉伸8, 切除-拉伸9 ×8 about axis
    pattern_circular_3_axis = Axis((0, 0, 0), (0, 1, 0))
    add([cut_extrude_8.rotate(pattern_circular_3_axis, i * 360 / PATTERN_CIRCULAR_3_COUNT) for i in range(1, PATTERN_CIRCULAR_3_COUNT)], mode=Mode.SUBTRACT)
    add([cut_extrude_9.rotate(pattern_circular_3_axis, i * 360 / PATTERN_CIRCULAR_3_COUNT) for i in range(1, PATTERN_CIRCULAR_3_COUNT)], mode=Mode.SUBTRACT)

    # 草图19 → 切除-拉伸11 (cut)
    with BuildSketch(Plane.XZ):
        Rectangle(SKETCH_19_W, SKETCH_19_H)
    extrude(amount=-CUT_EXTRUDE_11_DEPTH, mode=Mode.SUBTRACT)


solid = part.part
